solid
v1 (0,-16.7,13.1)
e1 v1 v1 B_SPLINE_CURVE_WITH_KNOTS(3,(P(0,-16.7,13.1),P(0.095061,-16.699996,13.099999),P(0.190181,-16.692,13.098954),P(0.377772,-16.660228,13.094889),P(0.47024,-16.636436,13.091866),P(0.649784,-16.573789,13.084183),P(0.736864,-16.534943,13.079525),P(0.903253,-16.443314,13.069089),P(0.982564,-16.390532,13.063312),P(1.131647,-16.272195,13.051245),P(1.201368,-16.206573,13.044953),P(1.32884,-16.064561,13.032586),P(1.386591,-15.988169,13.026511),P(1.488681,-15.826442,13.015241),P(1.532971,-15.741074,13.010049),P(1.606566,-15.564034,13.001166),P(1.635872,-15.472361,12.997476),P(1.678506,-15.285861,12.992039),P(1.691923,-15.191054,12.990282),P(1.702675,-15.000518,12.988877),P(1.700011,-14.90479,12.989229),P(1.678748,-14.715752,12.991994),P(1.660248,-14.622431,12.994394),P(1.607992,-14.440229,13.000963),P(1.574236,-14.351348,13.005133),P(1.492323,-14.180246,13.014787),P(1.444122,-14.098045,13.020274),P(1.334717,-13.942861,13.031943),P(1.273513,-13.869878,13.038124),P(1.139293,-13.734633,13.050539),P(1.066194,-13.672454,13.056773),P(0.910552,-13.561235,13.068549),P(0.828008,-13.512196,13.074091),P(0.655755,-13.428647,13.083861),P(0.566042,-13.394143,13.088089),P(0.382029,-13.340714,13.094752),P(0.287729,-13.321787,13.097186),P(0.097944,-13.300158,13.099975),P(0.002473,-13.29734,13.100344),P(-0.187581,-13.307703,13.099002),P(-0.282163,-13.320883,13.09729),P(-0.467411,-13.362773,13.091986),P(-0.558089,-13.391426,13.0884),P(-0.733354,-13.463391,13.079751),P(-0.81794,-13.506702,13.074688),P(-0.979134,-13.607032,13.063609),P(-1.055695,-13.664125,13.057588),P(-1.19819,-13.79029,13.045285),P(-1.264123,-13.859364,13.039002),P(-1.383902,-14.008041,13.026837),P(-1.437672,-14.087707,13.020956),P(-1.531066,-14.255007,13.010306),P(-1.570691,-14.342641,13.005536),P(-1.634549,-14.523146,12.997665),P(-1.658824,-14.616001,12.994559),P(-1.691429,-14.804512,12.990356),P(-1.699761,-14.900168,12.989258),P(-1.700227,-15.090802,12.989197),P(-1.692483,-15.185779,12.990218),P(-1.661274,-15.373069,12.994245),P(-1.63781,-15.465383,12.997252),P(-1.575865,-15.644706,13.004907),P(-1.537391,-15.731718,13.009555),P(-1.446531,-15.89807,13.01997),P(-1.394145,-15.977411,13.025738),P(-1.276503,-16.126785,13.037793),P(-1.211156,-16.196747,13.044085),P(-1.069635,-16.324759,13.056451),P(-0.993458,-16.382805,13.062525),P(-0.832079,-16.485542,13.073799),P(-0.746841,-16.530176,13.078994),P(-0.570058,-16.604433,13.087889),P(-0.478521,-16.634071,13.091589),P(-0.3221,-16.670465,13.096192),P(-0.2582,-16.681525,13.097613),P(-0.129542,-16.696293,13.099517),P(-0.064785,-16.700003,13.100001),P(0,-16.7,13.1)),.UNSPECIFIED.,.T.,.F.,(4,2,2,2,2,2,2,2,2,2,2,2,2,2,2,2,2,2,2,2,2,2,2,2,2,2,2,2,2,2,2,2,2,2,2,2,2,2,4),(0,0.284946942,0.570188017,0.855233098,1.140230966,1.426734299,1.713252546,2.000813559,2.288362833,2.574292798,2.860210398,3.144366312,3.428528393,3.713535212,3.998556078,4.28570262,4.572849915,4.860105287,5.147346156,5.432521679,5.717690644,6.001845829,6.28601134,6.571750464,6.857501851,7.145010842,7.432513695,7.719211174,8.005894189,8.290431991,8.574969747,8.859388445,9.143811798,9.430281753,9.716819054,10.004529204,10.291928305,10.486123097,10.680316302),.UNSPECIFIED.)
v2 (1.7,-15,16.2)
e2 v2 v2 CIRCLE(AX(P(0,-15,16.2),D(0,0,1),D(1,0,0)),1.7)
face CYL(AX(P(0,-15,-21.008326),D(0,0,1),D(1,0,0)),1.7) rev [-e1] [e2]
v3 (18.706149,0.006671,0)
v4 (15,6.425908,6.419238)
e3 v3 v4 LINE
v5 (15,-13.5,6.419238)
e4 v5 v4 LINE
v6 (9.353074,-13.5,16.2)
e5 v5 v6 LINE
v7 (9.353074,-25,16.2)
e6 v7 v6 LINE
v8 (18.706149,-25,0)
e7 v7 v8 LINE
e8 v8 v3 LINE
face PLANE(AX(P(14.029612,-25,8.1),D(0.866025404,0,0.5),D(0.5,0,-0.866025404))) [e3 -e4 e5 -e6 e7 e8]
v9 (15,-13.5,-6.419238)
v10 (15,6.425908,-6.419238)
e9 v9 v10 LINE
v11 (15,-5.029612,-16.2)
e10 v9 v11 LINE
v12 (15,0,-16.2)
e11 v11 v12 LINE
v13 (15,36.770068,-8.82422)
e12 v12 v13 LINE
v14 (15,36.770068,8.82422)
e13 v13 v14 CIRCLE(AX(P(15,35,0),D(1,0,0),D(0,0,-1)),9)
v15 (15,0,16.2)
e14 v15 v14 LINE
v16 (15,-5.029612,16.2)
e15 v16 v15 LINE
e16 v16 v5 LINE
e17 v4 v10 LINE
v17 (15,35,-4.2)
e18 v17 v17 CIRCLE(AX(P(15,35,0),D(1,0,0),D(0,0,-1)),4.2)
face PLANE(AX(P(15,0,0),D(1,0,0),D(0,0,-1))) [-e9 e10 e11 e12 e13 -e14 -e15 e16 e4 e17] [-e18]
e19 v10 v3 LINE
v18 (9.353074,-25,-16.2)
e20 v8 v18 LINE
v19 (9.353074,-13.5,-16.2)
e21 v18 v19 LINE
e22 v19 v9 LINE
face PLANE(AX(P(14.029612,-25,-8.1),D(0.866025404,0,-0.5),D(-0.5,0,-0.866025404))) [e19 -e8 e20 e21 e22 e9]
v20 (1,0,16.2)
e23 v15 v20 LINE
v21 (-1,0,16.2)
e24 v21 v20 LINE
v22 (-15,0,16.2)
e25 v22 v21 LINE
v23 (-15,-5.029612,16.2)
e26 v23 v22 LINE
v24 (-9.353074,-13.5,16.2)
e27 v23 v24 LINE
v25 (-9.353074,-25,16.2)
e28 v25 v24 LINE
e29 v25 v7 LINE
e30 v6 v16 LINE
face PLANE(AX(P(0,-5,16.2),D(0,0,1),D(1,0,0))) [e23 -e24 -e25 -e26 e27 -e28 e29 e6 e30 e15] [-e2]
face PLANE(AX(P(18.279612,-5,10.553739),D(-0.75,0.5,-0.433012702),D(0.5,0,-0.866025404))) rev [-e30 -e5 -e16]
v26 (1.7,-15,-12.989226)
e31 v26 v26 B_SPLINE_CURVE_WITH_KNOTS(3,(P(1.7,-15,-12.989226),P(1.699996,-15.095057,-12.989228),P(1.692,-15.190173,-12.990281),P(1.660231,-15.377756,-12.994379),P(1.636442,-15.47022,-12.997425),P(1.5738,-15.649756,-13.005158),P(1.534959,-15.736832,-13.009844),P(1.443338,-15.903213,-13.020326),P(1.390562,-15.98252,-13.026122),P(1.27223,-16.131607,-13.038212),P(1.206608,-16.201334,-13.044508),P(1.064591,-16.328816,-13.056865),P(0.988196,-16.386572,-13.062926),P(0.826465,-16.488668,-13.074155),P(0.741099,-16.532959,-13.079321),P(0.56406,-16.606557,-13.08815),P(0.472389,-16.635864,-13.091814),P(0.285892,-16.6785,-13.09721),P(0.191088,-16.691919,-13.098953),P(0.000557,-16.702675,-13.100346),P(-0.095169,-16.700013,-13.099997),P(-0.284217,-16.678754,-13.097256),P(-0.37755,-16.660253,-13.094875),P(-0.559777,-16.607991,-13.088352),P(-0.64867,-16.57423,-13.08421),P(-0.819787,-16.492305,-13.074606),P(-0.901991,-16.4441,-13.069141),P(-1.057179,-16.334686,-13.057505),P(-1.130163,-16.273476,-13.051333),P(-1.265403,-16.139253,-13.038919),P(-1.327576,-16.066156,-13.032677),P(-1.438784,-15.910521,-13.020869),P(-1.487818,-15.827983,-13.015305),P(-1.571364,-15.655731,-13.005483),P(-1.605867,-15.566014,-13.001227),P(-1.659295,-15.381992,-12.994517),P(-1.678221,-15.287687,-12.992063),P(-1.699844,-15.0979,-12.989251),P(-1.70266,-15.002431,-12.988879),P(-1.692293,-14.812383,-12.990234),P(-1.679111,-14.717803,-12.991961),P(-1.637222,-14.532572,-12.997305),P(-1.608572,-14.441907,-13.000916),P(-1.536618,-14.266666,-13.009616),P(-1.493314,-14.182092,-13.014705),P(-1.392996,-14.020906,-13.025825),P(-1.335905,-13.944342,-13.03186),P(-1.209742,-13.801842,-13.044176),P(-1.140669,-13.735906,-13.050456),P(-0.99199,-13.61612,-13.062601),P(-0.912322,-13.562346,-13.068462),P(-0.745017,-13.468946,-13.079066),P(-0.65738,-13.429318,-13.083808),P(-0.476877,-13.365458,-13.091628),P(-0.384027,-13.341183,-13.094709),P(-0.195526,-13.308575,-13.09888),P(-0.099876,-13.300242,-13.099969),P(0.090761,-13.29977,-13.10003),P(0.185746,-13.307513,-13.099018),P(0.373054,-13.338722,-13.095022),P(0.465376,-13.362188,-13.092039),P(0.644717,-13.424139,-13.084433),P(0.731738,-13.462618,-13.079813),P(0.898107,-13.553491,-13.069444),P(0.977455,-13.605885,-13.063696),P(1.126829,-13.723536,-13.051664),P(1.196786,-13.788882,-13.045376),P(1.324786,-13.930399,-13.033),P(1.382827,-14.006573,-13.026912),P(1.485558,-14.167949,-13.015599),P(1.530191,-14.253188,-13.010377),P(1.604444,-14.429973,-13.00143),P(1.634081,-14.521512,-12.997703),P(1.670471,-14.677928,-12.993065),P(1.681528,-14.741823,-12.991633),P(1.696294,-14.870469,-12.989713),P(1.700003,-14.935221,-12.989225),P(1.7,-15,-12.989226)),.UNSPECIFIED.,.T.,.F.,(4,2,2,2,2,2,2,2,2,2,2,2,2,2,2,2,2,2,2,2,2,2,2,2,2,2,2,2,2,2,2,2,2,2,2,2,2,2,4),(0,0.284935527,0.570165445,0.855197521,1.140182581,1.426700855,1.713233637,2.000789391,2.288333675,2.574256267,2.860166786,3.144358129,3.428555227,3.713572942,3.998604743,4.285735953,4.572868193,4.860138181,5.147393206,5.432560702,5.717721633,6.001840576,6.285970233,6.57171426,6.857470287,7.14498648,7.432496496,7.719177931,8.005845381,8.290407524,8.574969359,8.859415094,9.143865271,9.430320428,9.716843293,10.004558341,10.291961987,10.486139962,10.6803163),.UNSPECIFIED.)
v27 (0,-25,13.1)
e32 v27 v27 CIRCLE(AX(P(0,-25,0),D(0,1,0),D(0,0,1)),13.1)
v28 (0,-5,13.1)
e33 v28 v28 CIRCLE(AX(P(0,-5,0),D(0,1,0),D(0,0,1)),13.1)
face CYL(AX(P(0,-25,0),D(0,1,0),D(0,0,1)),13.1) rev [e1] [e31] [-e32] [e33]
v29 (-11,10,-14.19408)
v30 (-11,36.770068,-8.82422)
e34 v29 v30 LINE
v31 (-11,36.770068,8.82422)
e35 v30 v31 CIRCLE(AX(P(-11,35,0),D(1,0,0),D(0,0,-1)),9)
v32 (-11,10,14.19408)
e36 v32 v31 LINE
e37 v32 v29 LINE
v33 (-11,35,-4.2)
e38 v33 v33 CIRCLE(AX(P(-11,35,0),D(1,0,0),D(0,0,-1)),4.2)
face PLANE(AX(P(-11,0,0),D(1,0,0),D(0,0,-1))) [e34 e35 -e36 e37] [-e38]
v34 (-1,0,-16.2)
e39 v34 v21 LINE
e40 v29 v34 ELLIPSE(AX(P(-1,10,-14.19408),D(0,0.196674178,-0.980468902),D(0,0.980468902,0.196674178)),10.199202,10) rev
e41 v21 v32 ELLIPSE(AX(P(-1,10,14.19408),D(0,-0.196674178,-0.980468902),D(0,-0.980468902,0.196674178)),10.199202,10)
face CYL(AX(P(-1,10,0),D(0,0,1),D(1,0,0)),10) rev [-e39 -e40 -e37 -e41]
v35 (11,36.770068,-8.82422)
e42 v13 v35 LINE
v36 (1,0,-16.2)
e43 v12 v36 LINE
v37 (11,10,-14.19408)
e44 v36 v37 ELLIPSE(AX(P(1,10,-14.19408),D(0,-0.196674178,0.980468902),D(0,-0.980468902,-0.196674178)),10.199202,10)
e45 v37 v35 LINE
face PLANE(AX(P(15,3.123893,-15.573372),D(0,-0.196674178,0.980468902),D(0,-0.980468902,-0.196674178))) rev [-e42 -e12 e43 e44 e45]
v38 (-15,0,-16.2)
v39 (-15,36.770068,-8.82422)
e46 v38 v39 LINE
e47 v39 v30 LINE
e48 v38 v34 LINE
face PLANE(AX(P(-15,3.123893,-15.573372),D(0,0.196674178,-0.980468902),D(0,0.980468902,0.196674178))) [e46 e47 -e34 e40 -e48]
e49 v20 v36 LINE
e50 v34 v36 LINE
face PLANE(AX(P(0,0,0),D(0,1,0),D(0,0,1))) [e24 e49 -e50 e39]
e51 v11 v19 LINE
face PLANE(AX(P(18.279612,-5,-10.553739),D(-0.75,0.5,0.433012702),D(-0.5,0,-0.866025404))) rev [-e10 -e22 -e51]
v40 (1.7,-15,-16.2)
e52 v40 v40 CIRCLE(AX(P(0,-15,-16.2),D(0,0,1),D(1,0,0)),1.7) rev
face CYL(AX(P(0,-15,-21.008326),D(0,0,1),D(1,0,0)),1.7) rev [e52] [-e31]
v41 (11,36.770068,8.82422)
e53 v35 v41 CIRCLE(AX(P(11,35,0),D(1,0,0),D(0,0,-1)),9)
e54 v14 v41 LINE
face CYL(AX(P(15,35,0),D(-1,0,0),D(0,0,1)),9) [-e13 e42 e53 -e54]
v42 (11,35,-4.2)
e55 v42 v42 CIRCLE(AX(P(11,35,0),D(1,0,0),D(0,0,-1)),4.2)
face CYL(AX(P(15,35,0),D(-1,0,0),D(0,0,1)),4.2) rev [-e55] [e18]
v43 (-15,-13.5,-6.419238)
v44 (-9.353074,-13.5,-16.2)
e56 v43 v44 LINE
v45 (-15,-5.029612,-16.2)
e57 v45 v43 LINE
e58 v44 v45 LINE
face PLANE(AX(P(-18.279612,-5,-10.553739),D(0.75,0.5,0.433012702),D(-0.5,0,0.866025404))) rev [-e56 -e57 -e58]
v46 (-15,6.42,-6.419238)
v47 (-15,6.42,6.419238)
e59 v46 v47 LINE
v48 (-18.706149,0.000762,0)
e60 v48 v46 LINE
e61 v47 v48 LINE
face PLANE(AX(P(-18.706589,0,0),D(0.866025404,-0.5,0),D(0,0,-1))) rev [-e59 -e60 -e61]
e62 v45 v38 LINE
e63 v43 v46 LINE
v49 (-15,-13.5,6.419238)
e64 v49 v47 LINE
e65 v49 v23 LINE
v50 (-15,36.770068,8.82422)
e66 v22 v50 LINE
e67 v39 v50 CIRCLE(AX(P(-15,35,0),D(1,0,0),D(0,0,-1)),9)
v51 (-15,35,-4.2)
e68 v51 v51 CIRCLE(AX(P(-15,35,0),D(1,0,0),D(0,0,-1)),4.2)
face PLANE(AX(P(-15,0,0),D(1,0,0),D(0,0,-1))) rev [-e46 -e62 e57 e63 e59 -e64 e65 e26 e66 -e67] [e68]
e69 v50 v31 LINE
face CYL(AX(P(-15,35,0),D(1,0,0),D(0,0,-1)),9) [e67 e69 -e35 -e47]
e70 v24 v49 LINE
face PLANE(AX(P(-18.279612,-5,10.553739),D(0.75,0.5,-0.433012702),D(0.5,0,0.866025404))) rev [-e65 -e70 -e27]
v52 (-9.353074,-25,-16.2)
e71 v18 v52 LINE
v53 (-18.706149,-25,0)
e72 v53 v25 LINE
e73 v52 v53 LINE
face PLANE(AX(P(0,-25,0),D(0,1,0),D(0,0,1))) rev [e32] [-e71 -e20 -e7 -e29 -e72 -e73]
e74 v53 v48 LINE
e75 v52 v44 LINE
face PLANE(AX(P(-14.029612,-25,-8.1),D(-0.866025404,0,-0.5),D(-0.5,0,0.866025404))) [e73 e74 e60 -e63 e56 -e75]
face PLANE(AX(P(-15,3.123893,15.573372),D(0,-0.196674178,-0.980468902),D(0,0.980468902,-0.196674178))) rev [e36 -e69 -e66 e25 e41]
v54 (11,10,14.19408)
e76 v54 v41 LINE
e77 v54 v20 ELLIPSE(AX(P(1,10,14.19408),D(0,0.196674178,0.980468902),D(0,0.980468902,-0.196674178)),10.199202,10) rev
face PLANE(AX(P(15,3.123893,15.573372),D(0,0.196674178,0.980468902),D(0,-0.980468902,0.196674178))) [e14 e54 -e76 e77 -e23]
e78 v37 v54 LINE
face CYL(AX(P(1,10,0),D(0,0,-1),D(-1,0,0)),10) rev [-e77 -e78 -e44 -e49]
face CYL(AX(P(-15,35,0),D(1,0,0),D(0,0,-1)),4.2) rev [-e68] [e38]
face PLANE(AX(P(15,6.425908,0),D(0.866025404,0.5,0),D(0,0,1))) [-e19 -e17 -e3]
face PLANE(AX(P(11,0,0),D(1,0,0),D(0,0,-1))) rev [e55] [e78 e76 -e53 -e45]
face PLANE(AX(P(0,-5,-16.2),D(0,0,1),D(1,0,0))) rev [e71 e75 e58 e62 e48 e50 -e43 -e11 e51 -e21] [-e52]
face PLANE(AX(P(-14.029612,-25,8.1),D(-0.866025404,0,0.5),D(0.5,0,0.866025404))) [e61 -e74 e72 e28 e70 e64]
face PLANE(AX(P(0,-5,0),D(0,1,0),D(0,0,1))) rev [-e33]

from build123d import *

# Parameters (mm, degrees)
SALIENTE_EXTRUIR1_START = 11
CROQUIS1_R              = 4.2
SALIENTE_EXTRUIR1_DEPTH = 4
SALIENTE_EXTRUIR2_START = -11
CROQUIS1_3_R            = 4.2
SALIENTE_EXTRUIR2_DEPTH = 4
CROQUIS2_R              = 13.1
SALIENTE_EXTRUIR3_DEPTH = 5
CROQUIS2_3_R            = 13.1
SALIENTE_EXTRUIR4_DEPTH = 25
CHAFL_N1_SIZE           = 8.5
CHAFL_N1_SIZE_2         = 4.907477288
CHAFL_N3_SIZE           = 6.42
CHAFL_N3_SIZE_2         = 3.706588728
CHAFL_N4_SIZE           = 6.425908496
CHAFL_N4_SIZE_2         = 3.71
REDONDEO2_R             = 10
CORTAR_EXTRUIR1_REACH   = 59.755
CROQUIS3_R              = 1.7


with BuildPart() as part:
    # Croquis1 → Saliente-Extruir1 (new body)
    with BuildSketch(Plane(origin=(0, 0, 0), x_dir=(0, 0, -1), z_dir=(1, 0, 0)).offset(SALIENTE_EXTRUIR1_START)):
        with BuildLine():
            Line((-16.2, 0), (16.2, 0))
            Line((16.2, 0), (8.824220118, 36.770067598))
            ThreePointArc((8.824220118, 36.770067598), (0, 44), (-8.824220118, 36.770067598))
            Line((-8.824220118, 36.770067598), (-16.2, 0))
        make_face()
        with Locations((0, 35)):
            Circle(CROQUIS1_R, mode=Mode.SUBTRACT)
    extrude(amount=SALIENTE_EXTRUIR1_DEPTH)



with BuildPart() as body_2:
    # Croquis1<3> → Saliente-Extruir2 (new body)
    with BuildSketch(Plane(origin=(0, 0, 0), x_dir=(0, 0, -1), z_dir=(1, 0, 0)).offset(SALIENTE_EXTRUIR2_START)):
        with BuildLine():
            Line((-16.2, 0), (16.2, 0))
            Line((16.2, 0), (8.824220118, 36.770067598))
            ThreePointArc((8.824220118, 36.770067598), (0, 44), (-8.824220118, 36.770067598))
            Line((-8.824220118, 36.770067598), (-16.2, 0))
        make_face()
        with Locations((0, 35)):
            Circle(CROQUIS1_3_R, mode=Mode.SUBTRACT)
    extrude(amount=-SALIENTE_EXTRUIR2_DEPTH)


with BuildPart() as part_1:
    add(part.part)

    add(body_2.part)  # Saliente-Extruir3 merges body 2
    # Croquis2 → Saliente-Extruir3 (add)
    with BuildSketch(Plane(origin=(0, 0, 0), x_dir=(1, 0, 0), z_dir=(0, 1, 0))):
        Polygon((-9.353074361, -16.2), (-15, -6.419237886), (-15, -16.2), align=None)
        Polygon((15, -16.2), (15, -6.419237886), (9.353074361, -16.2), align=None)
        Polygon((15, 16.2), (9.353074361, 16.2), (15, 6.419237886), align=None)
        Polygon((-15, 6.419237886), (-9.353074361, 16.2), (-15, 16.2), align=None)
        with Locations(Location((0, 0, 0), (0, 0, 270))):
            Circle(CROQUIS2_R)
    extrude(amount=-SALIENTE_EXTRUIR3_DEPTH)

    # Croquis2<3> → Saliente-Extruir4 (add)
    with BuildSketch(Plane(origin=(0, 0, 0), x_dir=(1, 0, 0), z_dir=(0, 1, 0))):
        Polygon((9.353074361, -16.2), (18.706148722, 0), (9.353074361, 16.2), (-9.353074361, 16.2), (-18.706148722, 0), (-9.353074361, -16.2), align=None)
        with Locations(Location((0, 0, 0), (0, 0, 270))):
            Circle(CROQUIS2_3_R, mode=Mode.SUBTRACT)
    extrude(amount=-SALIENTE_EXTRUIR4_DEPTH)

    # Chaflán1
    # the kernel refuses this chamfer: 8.5, 4.907477288 mm, written as the material it adds along each edge
    with BuildSketch(Plane(origin=(-1.642040096, -5, -35.244096875), x_dir=(-0.01673746999358639, -0.9998132206222078, 0.00966338280635039), z_dir=(0.5000000000000002, 0, 0.8660254037844386))) as chafl_n1_piece_1_section:
        Polygon((CHAFL_N1_SIZE * 0.999813220622, CHAFL_N1_SIZE * 0.0193267656127), (-CHAFL_N1_SIZE_2 * 0.0193267656131, CHAFL_N1_SIZE_2 * 0.999813220645), (0, 0), align=None)
    chafl_n1_piece_1 = extrude(amount=55.274309107, mode=Mode.PRIVATE)
    chafl_n1_piece_1 = split(chafl_n1_piece_1, bisect_by=Plane(origin=(12.808321649, -8.299879968, -16.2), z_dir=(0, 0, 1)), keep=Keep.TOP, mode=Mode.PRIVATE)
    chafl_n1_piece_1 = split(chafl_n1_piece_1, bisect_by=Plane(origin=(15, -8.299879968, -12.403901743), z_dir=(-1, 0, 0)), keep=Keep.TOP, mode=Mode.PRIVATE)
    add(chafl_n1_piece_1)
    with BuildSketch(Plane(origin=(-25.995114457, -5, 12.624858989), x_dir=(-0.8645728572665671, 0.057893862402670776, -0.4991613718768959), z_dir=(0.49999999999999956, 0, -0.8660254037844389))) as chafl_n1_piece_2_section:
        Polygon((CHAFL_N1_SIZE_2 * 0.998322743777, -CHAFL_N1_SIZE_2 * 0.057893862404), (-CHAFL_N1_SIZE * 0.0578938624027, -CHAFL_N1_SIZE * 0.998322743754), (0, 0), align=None)
    chafl_n1_piece_2 = extrude(amount=55.274309107, mode=Mode.PRIVATE)
    chafl_n1_piece_2 = split(chafl_n1_piece_2, bisect_by=Plane(origin=(-15, -8.299879968, -12.403901743), z_dir=(1, 0, 0)), keep=Keep.TOP, mode=Mode.PRIVATE)
    chafl_n1_piece_2 = split(chafl_n1_piece_2, bisect_by=Plane(origin=(-12.808321649, -8.299879968, -16.2), z_dir=(0, 0, 1)), keep=Keep.TOP, mode=Mode.PRIVATE)
    add(chafl_n1_piece_2)
    with BuildSketch(Plane(origin=(1.642040096, -5, 35.244096875), x_dir=(0.016737469993586364, -0.9998132206222078, -0.00966338280635038), z_dir=(-0.5000000000000004, 0, -0.8660254037844385))) as chafl_n1_piece_3_section:
        Polygon((CHAFL_N1_SIZE * 0.999813220622, CHAFL_N1_SIZE * 0.0193267656127), (-CHAFL_N1_SIZE_2 * 0.0193267656131, CHAFL_N1_SIZE_2 * 0.999813220645), (0, 0), align=None)
    chafl_n1_piece_3 = extrude(amount=55.274309107, mode=Mode.PRIVATE)
    chafl_n1_piece_3 = split(chafl_n1_piece_3, bisect_by=Plane(origin=(-15, -8.299879968, 12.403901743), z_dir=(1, 0, 0)), keep=Keep.TOP, mode=Mode.PRIVATE)
    chafl_n1_piece_3 = split(chafl_n1_piece_3, bisect_by=Plane(origin=(-12.808321649, -8.299879968, 16.2), z_dir=(0, 0, -1)), keep=Keep.TOP, mode=Mode.PRIVATE)
    add(chafl_n1_piece_3)
    with BuildSketch(Plane(origin=(25.995114457, -5, -12.624858989), x_dir=(-0.016737469993586725, -0.9998132206222078, -0.009663382806350568), z_dir=(-0.4999999999999995, 0, 0.8660254037844389))) as chafl_n1_piece_4_section:
        Polygon((CHAFL_N1_SIZE * 0.999813220622, CHAFL_N1_SIZE * 0.0193267656127), (-CHAFL_N1_SIZE_2 * 0.0193267656131, CHAFL_N1_SIZE_2 * 0.999813220645), (0, 0), align=None)
    chafl_n1_piece_4 = extrude(amount=55.274309107, mode=Mode.PRIVATE)
    chafl_n1_piece_4 = split(chafl_n1_piece_4, bisect_by=Plane(origin=(15, -8.299879968, 12.403901743), z_dir=(-1, 0, 0)), keep=Keep.TOP, mode=Mode.PRIVATE)
    chafl_n1_piece_4 = split(chafl_n1_piece_4, bisect_by=Plane(origin=(12.808321649, -8.299879968, 16.2), z_dir=(0, 0, -1)), keep=Keep.TOP, mode=Mode.PRIVATE)
    add(chafl_n1_piece_4)

    # Chaflán3
    # the kernel refuses this chamfer: 6.42, 3.706588728 mm, written as the material it adds along each edge
    with BuildSketch(Plane(origin=(-15, 0, 23.028328431), x_dir=(0.019326765612700848, 0.9998132206222079, 0), z_dir=(0, 0, -1))) as chafl_n3_piece_1_section:
        Polygon((CHAFL_N3_SIZE * 0.999813220622, -CHAFL_N3_SIZE * 0.0193267656127), (-CHAFL_N3_SIZE_2 * 0.0193267656137, -CHAFL_N3_SIZE_2 * 0.999813220675), (0, 0), align=None)
    chafl_n3_piece_1 = extrude(amount=46.056656863, mode=Mode.PRIVATE)
    chafl_n3_piece_1 = split(chafl_n3_piece_1, bisect_by=Plane(origin=(-17.986677842, 2.490730723, 1.246160118), z_dir=(0.8660254037844385, 0, -0.5000000000000004)), keep=Keep.TOP, mode=Mode.PRIVATE)
    chafl_n3_piece_1 = split(chafl_n3_piece_1, bisect_by=Plane(origin=(-17.986677842, 2.490730723, -1.246160118), z_dir=(0.8660254037844389, 0, 0.4999999999999996)), keep=Keep.TOP, mode=Mode.PRIVATE)
    add(chafl_n3_piece_1)

    # Chaflán4
    # the kernel refuses this chamfer: 6.425908496, 3.71 mm, written as the material it adds along each edge
    with BuildSketch(Plane(origin=(15, 0, 23.043614217), x_dir=(-0.019326765612700598, 0.9998132206222079, 0), z_dir=(0, 0, -1))) as chafl_n4_piece_1_section:
        Polygon((CHAFL_N4_SIZE * 0.999813220635, CHAFL_N4_SIZE * 0.0193267656129), (-CHAFL_N4_SIZE_2 * 0.0193267656127, CHAFL_N4_SIZE_2 * 0.999813220622), (0, 0), align=None)
    chafl_n4_piece_1 = extrude(amount=46.087228435, mode=Mode.PRIVATE)
    chafl_n4_piece_1 = split(chafl_n4_piece_1, bisect_by=Plane(origin=(17.986748418, 2.493472797, -1.246037877), z_dir=(-0.8660254037844386, 0, 0.5000000000000003)), keep=Keep.TOP, mode=Mode.PRIVATE)
    chafl_n4_piece_1 = split(chafl_n4_piece_1, bisect_by=Plane(origin=(17.986748418, 2.493472797, 1.246037877), z_dir=(-0.8660254037844389, 0, -0.4999999999999996)), keep=Keep.TOP, mode=Mode.PRIVATE)
    add(chafl_n4_piece_1)

    # Redondeo2
    redondeo2_edges = [part_1.edges().sort_by_distance(p)[0] for p in [
        (-11, 0, 0),
        (11, 0, 0),
    ]]
    fillet(redondeo2_edges, radius=REDONDEO2_R)

    # Cortar-Extruir1: up to this face of the body (flat: up to its plane)
    cortar_extruir1_end = Plane(part_1.part.faces().sort_by_distance((0, -11.120511865, -16.2))[0])
    # Croquis3 → Cortar-Extruir1 (cut, up to the picked face)
    with BuildSketch(Plane.XY.offset(16.2), mode=Mode.PRIVATE) as cortar_extruir1_sk1:
        with Locations((0, -15)):
            Circle(CROQUIS3_R)
    cortar_extruir1_tool1 = split(extrude(cortar_extruir1_sk1.sketch, amount=-CORTAR_EXTRUIR1_REACH, mode=Mode.PRIVATE), bisect_by=cortar_extruir1_end, keep=Keep.BOTH, mode=Mode.PRIVATE)
    add(cortar_extruir1_tool1.solids().sort_by(Axis((0, -15, 16.2), (0, 0, -1)))[0], mode=Mode.SUBTRACT)


solid = part_1.part
